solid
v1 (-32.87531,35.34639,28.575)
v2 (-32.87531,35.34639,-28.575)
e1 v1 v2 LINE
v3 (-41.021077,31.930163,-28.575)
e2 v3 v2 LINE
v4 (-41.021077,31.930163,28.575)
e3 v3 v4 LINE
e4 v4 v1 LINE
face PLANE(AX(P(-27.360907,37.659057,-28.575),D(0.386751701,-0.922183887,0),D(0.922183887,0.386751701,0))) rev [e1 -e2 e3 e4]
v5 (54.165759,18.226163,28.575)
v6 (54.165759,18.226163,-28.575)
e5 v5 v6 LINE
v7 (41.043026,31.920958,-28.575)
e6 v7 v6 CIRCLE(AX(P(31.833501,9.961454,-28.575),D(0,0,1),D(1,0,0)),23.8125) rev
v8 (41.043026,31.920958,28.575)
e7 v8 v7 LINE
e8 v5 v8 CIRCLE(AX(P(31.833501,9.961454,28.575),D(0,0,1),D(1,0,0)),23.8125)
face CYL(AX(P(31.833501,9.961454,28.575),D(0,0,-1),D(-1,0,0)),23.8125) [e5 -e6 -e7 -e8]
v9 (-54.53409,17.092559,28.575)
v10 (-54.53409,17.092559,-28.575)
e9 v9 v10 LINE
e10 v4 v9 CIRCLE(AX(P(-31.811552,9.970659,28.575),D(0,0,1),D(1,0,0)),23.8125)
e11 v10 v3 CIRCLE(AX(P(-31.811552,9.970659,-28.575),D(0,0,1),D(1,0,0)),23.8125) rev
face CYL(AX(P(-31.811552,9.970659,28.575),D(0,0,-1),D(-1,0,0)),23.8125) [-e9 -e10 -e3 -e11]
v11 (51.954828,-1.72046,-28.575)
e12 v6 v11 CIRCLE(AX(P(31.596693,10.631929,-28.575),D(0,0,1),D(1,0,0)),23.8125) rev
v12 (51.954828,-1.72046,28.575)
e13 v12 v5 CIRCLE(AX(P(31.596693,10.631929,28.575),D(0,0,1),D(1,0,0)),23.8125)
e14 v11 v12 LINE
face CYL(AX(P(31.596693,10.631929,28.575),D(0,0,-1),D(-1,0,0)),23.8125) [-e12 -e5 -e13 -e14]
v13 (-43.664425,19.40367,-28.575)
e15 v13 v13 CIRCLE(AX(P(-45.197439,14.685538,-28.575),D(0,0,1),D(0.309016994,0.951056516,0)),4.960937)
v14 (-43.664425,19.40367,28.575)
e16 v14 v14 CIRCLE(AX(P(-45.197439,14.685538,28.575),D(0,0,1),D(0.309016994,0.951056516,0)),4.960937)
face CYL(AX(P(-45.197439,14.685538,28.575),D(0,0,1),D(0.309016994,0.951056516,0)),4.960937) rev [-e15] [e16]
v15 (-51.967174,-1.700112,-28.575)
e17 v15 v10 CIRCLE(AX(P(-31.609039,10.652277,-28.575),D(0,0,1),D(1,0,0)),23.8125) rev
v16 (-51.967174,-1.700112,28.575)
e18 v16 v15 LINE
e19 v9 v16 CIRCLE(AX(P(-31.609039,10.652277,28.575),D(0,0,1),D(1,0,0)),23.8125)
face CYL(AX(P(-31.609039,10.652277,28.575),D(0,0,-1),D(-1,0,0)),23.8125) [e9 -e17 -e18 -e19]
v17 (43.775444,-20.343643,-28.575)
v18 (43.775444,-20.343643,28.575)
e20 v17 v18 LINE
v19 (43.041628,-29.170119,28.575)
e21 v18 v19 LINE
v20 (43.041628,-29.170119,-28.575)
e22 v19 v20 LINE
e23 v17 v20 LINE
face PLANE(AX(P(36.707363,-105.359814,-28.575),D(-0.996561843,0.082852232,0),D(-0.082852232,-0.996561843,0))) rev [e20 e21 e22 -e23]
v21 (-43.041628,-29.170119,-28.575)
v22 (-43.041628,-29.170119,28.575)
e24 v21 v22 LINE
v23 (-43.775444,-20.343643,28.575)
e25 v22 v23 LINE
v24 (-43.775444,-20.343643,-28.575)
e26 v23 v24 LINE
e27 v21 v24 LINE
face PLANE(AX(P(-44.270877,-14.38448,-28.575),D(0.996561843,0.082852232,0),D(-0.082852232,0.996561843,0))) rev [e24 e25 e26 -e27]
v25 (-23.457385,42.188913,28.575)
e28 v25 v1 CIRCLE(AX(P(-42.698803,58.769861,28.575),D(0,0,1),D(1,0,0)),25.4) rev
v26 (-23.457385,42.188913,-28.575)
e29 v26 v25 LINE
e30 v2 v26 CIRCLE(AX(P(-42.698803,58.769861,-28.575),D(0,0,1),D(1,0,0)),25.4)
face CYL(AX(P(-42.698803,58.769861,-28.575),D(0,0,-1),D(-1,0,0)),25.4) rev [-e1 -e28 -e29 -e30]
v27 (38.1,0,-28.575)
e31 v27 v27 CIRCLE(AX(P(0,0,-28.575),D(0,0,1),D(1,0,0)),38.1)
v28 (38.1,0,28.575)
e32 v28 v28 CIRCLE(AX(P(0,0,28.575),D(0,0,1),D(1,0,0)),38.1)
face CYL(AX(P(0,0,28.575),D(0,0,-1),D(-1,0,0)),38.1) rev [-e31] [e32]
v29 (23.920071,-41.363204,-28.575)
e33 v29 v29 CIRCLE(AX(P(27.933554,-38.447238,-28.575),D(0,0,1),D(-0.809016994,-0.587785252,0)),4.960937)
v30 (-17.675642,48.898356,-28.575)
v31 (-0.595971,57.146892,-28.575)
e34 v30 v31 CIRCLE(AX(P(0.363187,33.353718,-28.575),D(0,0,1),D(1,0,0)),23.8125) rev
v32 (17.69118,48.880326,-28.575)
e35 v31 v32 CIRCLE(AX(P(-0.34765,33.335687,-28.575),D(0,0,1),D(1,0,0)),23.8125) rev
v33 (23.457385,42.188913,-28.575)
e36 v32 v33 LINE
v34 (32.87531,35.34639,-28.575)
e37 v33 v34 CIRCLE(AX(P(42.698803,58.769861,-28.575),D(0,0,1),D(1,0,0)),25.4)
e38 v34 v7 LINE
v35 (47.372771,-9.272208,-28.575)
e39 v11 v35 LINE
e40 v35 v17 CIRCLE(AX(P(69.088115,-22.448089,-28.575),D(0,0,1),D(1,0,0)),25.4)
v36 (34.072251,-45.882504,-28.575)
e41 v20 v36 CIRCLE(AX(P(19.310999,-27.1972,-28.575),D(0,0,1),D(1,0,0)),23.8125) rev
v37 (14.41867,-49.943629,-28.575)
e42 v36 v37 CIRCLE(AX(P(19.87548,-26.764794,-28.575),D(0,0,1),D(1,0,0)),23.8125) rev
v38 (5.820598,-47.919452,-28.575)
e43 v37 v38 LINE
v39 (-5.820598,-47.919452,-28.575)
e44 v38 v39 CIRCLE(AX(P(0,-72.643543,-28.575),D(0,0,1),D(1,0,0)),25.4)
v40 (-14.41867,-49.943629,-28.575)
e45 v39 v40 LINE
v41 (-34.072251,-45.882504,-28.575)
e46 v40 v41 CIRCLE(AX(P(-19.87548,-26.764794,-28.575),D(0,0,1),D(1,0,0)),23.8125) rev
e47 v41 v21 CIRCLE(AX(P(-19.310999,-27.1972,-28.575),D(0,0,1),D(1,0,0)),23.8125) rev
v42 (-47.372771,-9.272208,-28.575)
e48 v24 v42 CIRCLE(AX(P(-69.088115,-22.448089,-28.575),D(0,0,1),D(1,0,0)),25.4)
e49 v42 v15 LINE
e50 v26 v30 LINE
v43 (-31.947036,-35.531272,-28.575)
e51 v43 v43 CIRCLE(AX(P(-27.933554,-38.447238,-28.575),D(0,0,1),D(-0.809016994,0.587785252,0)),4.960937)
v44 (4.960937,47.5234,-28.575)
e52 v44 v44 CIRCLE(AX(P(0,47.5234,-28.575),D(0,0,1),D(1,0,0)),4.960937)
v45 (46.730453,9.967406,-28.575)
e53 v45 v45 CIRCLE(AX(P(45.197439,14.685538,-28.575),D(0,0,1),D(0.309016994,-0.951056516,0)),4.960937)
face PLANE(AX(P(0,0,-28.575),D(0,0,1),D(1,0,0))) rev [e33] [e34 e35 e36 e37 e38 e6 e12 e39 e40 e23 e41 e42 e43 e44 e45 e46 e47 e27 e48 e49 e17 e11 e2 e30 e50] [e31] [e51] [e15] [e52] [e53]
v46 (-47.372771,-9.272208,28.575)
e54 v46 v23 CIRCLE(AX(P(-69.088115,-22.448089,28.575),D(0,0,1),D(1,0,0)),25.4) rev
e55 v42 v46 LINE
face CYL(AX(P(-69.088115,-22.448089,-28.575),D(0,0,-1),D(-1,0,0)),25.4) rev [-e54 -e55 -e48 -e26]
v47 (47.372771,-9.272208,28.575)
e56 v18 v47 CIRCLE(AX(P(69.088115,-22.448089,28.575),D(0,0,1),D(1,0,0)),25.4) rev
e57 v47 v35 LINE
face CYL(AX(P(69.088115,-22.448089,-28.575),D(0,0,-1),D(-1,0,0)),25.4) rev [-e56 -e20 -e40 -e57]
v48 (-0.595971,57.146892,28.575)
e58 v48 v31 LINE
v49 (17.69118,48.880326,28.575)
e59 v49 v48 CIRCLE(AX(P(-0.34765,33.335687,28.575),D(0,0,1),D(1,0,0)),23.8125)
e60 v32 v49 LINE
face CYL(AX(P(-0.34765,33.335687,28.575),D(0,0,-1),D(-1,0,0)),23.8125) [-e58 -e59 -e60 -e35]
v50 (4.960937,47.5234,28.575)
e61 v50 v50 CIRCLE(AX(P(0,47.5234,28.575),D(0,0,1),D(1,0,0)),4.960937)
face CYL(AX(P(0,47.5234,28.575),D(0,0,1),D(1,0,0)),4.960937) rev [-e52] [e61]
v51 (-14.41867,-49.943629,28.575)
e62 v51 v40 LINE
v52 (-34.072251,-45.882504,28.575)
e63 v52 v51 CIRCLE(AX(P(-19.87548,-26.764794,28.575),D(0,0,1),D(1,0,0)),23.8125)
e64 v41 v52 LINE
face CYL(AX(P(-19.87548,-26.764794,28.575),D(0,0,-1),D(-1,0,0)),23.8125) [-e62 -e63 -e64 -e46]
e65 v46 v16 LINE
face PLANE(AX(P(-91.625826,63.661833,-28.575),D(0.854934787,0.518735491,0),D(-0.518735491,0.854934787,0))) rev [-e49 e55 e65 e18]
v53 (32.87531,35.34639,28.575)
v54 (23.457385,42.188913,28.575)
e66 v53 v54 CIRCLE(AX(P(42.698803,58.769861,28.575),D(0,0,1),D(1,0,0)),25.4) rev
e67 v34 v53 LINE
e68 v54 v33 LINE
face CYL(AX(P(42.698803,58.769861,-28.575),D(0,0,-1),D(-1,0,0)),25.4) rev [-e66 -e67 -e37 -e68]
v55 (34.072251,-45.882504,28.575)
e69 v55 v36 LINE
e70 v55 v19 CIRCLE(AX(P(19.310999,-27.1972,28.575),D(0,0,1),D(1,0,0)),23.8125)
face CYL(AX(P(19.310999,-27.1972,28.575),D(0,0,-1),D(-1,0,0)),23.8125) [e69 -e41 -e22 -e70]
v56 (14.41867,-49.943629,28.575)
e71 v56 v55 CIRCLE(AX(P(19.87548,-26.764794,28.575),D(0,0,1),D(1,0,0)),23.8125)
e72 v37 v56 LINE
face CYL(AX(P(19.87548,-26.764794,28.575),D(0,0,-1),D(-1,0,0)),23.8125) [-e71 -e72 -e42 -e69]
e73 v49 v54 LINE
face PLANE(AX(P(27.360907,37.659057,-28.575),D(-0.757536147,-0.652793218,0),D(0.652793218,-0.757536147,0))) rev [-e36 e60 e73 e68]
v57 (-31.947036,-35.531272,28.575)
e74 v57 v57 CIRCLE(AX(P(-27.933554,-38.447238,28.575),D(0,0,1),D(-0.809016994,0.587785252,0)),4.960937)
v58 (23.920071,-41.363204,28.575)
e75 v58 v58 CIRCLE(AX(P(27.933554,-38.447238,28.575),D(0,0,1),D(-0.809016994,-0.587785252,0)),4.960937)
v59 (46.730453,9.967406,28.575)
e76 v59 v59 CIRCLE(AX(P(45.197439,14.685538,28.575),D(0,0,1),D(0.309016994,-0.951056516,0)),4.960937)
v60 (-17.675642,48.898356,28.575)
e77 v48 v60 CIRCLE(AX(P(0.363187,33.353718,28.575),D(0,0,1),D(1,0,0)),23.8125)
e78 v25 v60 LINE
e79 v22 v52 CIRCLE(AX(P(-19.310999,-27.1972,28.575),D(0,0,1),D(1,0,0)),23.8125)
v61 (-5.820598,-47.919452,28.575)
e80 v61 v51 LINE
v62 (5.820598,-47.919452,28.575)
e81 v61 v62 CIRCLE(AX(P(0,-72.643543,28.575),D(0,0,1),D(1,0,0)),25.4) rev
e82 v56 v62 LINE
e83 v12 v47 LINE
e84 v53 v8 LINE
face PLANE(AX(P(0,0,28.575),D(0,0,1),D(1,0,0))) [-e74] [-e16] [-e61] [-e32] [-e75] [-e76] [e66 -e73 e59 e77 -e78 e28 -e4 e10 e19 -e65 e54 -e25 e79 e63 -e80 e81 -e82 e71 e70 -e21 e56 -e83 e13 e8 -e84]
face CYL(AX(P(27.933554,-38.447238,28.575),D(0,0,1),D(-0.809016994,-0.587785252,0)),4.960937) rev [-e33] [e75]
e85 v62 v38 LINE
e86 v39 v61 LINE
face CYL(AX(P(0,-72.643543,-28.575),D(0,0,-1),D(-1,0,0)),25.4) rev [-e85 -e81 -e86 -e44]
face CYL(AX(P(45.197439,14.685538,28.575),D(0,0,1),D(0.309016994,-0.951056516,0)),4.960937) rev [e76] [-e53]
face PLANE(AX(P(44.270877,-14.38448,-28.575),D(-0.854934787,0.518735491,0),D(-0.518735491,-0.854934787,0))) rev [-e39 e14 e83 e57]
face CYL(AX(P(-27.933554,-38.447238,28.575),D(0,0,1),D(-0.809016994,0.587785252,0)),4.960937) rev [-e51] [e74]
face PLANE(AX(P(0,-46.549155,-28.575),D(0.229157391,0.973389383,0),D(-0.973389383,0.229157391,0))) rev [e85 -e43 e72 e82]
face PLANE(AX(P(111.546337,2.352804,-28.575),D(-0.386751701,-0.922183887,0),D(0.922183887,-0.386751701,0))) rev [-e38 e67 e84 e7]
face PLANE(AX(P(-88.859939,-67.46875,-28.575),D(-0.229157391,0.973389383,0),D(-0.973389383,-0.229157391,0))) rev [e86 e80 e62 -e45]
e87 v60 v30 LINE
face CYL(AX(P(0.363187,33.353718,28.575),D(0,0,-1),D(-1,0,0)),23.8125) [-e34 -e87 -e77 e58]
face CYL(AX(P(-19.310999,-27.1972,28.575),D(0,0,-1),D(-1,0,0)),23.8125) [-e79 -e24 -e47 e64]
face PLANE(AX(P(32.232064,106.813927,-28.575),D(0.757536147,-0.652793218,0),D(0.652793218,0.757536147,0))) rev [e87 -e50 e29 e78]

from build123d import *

# Parameters (mm, degrees)
SKETCH1_R                        = 57.15
SKETCH1_R_2                      = 38.1
BOSS_EXTRUDE1_DEPTH              = 28.575
F_25_64_0_39063_DIAMETER_HOLE2_D = 9.921875
CIRPATTERN2_COUNT                = 5
CUT_EXTRUDE2_DEPTH               = 99.986703653
FILLET1_R                        = 23.8125
FILLET2_R                        = 25.4
CIRPATTERN1_START                = -28.575
CIRPATTERN1_DEPTH                = 57.15


# Read off the part's stored shape, not the designer's step: CirPattern1
with BuildPart() as part:
    # Sketch1 → Boss-Extrude1 (new, symmetric)
    with BuildSketch(Plane.XY):
        Circle(SKETCH1_R)
        Circle(SKETCH1_R_2, mode=Mode.SUBTRACT)
    extrude(amount=BOSS_EXTRUDE1_DEPTH, both=True)

    # 25/64 (0.39063) Diameter Hole2 (through all)
    with Locations(Plane.XY.offset(28.575)):
        with Locations((0, 47.5234)):
            f_25_64_0_39063_diameter_hole2 = Hole(F_25_64_0_39063_DIAMETER_HOLE2_D / 2)

    # CirPattern2: 25/64 (0.39063) Diameter Hole2 ×5 about axis
    cirpattern2_axis = Axis((0, 0, 0), (0, 0, 1))
    for i in range(1, CIRPATTERN2_COUNT):
        add(f_25_64_0_39063_diameter_hole2.rotate(cirpattern2_axis, i * 360 / CIRPATTERN2_COUNT), mode=Mode.SUBTRACT)

    # Sketch5 → Cut-Extrude2 (cut, through all)
    with BuildSketch(Plane.XY.offset(28.575)):
        Polygon((0, -46.54915497), (88.85993875, -67.46875), (-88.85993875, -67.46875), align=None)
    extrude(amount=-CUT_EXTRUDE2_DEPTH, mode=Mode.SUBTRACT)

    # Fillet1
    fillet1_edges = [part.edges().sort_by_distance(p)[0] for p in [
        (23.519318129, -52.086122669, 0),
        (-23.519318129, -52.086122669, 0),
    ]]
    fillet(fillet1_edges, radius=FILLET1_R)

    # Fillet2
    fillet2_edges = [part.edges().sort_by_distance(p)[0] for p in [
        (0, -46.54915497, 0),
    ]]
    fillet(fillet2_edges, radius=FILLET2_R)

    # CirPattern1 outline → CirPattern1 (cut)
    with BuildSketch(Plane.XY.offset(CIRPATTERN1_START)):
        with BuildLine():
            ThreePointArc((-43.775443864, -20.343642549), (-44.931279172, -14.59905758), (-47.372771091, -9.272207766))
            Line((-47.372771091, -9.272207766), (-51.967174053, -1.7001118))
            ThreePointArc((-51.967174053, -1.7001118), (-55.202463072, 7.429620219), (-54.5340897, 17.092558633))
            ThreePointArc((-54.5340897, 17.092558633), (-54.352879906, -17.660321229), (-34.072251451, -45.882504084))
            ThreePointArc((-34.072251451, -45.882504084), (-40.292709561, -38.457882702), (-43.041627602, -29.170119173))
            Line((-43.041627602, -29.170119173), (-43.775443864, -20.343642549))
        make_face()
        with BuildLine():
            ThreePointArc((34.072251451, -45.882504084), (54.534089699, -17.092558633), (54.165759228, 18.226163261))
            ThreePointArc((54.165759228, 18.226163261), (55.264246489, 8.008560011), (51.954827504, -1.72046031))
            Line((51.954827504, -1.72046031), (47.372771091, -9.272207766))
            ThreePointArc((47.372771091, -9.272207766), (44.931279172, -14.59905758), (43.775443864, -20.343642549))
            Line((43.775443864, -20.343642549), (43.041627602, -29.170119173))
            ThreePointArc((43.041627602, -29.170119173), (40.292709561, -38.457882702), (34.072251451, -45.882504084))
        make_face()
        with BuildLine():
            ThreePointArc((54.165759228, 18.226163261), (33.107949758, 46.583110274), (-0.595971221, 57.146892464))
            ThreePointArc((-0.595971221, 57.146892464), (9.460998162, 55.034202885), (17.691179628, 48.880325777))
            Line((17.691179628, 48.880325777), (23.457384954, 42.188912866))
            ThreePointArc((23.457384954, 42.188912866), (27.769057686, 38.220828948), (32.875309902, 35.346389866))
            Line((32.875309902, 35.346389866), (41.043026315, 31.92095785))
            ThreePointArc((41.043026315, 31.92095785), (49.026751951, 26.436504665), (54.165759228, 18.226163261))
        make_face()
        with BuildLine():
            ThreePointArc((-0.595971221, 57.146892464), (-34.072251451, 45.882504084), (-54.5340897, 17.092558633))
            ThreePointArc((-54.5340897, 17.092558633), (-49.417028058, 26.004447915), (-41.021077193, 31.930163021))
            Line((-41.021077193, 31.930163021), (-32.875309902, 35.346389866))
            ThreePointArc((-32.875309902, 35.346389866), (-27.769057686, 38.220828948), (-23.457384954, 42.188912866))
            Line((-23.457384954, 42.188912866), (-17.675642338, 48.898356078))
            ThreePointArc((-17.675642338, 48.898356078), (-9.992510498, 54.796541129), (-0.595971221, 57.146892464))
        make_face()
    extrude(amount=CIRPATTERN1_DEPTH, mode=Mode.SUBTRACT)


solid = part.part
